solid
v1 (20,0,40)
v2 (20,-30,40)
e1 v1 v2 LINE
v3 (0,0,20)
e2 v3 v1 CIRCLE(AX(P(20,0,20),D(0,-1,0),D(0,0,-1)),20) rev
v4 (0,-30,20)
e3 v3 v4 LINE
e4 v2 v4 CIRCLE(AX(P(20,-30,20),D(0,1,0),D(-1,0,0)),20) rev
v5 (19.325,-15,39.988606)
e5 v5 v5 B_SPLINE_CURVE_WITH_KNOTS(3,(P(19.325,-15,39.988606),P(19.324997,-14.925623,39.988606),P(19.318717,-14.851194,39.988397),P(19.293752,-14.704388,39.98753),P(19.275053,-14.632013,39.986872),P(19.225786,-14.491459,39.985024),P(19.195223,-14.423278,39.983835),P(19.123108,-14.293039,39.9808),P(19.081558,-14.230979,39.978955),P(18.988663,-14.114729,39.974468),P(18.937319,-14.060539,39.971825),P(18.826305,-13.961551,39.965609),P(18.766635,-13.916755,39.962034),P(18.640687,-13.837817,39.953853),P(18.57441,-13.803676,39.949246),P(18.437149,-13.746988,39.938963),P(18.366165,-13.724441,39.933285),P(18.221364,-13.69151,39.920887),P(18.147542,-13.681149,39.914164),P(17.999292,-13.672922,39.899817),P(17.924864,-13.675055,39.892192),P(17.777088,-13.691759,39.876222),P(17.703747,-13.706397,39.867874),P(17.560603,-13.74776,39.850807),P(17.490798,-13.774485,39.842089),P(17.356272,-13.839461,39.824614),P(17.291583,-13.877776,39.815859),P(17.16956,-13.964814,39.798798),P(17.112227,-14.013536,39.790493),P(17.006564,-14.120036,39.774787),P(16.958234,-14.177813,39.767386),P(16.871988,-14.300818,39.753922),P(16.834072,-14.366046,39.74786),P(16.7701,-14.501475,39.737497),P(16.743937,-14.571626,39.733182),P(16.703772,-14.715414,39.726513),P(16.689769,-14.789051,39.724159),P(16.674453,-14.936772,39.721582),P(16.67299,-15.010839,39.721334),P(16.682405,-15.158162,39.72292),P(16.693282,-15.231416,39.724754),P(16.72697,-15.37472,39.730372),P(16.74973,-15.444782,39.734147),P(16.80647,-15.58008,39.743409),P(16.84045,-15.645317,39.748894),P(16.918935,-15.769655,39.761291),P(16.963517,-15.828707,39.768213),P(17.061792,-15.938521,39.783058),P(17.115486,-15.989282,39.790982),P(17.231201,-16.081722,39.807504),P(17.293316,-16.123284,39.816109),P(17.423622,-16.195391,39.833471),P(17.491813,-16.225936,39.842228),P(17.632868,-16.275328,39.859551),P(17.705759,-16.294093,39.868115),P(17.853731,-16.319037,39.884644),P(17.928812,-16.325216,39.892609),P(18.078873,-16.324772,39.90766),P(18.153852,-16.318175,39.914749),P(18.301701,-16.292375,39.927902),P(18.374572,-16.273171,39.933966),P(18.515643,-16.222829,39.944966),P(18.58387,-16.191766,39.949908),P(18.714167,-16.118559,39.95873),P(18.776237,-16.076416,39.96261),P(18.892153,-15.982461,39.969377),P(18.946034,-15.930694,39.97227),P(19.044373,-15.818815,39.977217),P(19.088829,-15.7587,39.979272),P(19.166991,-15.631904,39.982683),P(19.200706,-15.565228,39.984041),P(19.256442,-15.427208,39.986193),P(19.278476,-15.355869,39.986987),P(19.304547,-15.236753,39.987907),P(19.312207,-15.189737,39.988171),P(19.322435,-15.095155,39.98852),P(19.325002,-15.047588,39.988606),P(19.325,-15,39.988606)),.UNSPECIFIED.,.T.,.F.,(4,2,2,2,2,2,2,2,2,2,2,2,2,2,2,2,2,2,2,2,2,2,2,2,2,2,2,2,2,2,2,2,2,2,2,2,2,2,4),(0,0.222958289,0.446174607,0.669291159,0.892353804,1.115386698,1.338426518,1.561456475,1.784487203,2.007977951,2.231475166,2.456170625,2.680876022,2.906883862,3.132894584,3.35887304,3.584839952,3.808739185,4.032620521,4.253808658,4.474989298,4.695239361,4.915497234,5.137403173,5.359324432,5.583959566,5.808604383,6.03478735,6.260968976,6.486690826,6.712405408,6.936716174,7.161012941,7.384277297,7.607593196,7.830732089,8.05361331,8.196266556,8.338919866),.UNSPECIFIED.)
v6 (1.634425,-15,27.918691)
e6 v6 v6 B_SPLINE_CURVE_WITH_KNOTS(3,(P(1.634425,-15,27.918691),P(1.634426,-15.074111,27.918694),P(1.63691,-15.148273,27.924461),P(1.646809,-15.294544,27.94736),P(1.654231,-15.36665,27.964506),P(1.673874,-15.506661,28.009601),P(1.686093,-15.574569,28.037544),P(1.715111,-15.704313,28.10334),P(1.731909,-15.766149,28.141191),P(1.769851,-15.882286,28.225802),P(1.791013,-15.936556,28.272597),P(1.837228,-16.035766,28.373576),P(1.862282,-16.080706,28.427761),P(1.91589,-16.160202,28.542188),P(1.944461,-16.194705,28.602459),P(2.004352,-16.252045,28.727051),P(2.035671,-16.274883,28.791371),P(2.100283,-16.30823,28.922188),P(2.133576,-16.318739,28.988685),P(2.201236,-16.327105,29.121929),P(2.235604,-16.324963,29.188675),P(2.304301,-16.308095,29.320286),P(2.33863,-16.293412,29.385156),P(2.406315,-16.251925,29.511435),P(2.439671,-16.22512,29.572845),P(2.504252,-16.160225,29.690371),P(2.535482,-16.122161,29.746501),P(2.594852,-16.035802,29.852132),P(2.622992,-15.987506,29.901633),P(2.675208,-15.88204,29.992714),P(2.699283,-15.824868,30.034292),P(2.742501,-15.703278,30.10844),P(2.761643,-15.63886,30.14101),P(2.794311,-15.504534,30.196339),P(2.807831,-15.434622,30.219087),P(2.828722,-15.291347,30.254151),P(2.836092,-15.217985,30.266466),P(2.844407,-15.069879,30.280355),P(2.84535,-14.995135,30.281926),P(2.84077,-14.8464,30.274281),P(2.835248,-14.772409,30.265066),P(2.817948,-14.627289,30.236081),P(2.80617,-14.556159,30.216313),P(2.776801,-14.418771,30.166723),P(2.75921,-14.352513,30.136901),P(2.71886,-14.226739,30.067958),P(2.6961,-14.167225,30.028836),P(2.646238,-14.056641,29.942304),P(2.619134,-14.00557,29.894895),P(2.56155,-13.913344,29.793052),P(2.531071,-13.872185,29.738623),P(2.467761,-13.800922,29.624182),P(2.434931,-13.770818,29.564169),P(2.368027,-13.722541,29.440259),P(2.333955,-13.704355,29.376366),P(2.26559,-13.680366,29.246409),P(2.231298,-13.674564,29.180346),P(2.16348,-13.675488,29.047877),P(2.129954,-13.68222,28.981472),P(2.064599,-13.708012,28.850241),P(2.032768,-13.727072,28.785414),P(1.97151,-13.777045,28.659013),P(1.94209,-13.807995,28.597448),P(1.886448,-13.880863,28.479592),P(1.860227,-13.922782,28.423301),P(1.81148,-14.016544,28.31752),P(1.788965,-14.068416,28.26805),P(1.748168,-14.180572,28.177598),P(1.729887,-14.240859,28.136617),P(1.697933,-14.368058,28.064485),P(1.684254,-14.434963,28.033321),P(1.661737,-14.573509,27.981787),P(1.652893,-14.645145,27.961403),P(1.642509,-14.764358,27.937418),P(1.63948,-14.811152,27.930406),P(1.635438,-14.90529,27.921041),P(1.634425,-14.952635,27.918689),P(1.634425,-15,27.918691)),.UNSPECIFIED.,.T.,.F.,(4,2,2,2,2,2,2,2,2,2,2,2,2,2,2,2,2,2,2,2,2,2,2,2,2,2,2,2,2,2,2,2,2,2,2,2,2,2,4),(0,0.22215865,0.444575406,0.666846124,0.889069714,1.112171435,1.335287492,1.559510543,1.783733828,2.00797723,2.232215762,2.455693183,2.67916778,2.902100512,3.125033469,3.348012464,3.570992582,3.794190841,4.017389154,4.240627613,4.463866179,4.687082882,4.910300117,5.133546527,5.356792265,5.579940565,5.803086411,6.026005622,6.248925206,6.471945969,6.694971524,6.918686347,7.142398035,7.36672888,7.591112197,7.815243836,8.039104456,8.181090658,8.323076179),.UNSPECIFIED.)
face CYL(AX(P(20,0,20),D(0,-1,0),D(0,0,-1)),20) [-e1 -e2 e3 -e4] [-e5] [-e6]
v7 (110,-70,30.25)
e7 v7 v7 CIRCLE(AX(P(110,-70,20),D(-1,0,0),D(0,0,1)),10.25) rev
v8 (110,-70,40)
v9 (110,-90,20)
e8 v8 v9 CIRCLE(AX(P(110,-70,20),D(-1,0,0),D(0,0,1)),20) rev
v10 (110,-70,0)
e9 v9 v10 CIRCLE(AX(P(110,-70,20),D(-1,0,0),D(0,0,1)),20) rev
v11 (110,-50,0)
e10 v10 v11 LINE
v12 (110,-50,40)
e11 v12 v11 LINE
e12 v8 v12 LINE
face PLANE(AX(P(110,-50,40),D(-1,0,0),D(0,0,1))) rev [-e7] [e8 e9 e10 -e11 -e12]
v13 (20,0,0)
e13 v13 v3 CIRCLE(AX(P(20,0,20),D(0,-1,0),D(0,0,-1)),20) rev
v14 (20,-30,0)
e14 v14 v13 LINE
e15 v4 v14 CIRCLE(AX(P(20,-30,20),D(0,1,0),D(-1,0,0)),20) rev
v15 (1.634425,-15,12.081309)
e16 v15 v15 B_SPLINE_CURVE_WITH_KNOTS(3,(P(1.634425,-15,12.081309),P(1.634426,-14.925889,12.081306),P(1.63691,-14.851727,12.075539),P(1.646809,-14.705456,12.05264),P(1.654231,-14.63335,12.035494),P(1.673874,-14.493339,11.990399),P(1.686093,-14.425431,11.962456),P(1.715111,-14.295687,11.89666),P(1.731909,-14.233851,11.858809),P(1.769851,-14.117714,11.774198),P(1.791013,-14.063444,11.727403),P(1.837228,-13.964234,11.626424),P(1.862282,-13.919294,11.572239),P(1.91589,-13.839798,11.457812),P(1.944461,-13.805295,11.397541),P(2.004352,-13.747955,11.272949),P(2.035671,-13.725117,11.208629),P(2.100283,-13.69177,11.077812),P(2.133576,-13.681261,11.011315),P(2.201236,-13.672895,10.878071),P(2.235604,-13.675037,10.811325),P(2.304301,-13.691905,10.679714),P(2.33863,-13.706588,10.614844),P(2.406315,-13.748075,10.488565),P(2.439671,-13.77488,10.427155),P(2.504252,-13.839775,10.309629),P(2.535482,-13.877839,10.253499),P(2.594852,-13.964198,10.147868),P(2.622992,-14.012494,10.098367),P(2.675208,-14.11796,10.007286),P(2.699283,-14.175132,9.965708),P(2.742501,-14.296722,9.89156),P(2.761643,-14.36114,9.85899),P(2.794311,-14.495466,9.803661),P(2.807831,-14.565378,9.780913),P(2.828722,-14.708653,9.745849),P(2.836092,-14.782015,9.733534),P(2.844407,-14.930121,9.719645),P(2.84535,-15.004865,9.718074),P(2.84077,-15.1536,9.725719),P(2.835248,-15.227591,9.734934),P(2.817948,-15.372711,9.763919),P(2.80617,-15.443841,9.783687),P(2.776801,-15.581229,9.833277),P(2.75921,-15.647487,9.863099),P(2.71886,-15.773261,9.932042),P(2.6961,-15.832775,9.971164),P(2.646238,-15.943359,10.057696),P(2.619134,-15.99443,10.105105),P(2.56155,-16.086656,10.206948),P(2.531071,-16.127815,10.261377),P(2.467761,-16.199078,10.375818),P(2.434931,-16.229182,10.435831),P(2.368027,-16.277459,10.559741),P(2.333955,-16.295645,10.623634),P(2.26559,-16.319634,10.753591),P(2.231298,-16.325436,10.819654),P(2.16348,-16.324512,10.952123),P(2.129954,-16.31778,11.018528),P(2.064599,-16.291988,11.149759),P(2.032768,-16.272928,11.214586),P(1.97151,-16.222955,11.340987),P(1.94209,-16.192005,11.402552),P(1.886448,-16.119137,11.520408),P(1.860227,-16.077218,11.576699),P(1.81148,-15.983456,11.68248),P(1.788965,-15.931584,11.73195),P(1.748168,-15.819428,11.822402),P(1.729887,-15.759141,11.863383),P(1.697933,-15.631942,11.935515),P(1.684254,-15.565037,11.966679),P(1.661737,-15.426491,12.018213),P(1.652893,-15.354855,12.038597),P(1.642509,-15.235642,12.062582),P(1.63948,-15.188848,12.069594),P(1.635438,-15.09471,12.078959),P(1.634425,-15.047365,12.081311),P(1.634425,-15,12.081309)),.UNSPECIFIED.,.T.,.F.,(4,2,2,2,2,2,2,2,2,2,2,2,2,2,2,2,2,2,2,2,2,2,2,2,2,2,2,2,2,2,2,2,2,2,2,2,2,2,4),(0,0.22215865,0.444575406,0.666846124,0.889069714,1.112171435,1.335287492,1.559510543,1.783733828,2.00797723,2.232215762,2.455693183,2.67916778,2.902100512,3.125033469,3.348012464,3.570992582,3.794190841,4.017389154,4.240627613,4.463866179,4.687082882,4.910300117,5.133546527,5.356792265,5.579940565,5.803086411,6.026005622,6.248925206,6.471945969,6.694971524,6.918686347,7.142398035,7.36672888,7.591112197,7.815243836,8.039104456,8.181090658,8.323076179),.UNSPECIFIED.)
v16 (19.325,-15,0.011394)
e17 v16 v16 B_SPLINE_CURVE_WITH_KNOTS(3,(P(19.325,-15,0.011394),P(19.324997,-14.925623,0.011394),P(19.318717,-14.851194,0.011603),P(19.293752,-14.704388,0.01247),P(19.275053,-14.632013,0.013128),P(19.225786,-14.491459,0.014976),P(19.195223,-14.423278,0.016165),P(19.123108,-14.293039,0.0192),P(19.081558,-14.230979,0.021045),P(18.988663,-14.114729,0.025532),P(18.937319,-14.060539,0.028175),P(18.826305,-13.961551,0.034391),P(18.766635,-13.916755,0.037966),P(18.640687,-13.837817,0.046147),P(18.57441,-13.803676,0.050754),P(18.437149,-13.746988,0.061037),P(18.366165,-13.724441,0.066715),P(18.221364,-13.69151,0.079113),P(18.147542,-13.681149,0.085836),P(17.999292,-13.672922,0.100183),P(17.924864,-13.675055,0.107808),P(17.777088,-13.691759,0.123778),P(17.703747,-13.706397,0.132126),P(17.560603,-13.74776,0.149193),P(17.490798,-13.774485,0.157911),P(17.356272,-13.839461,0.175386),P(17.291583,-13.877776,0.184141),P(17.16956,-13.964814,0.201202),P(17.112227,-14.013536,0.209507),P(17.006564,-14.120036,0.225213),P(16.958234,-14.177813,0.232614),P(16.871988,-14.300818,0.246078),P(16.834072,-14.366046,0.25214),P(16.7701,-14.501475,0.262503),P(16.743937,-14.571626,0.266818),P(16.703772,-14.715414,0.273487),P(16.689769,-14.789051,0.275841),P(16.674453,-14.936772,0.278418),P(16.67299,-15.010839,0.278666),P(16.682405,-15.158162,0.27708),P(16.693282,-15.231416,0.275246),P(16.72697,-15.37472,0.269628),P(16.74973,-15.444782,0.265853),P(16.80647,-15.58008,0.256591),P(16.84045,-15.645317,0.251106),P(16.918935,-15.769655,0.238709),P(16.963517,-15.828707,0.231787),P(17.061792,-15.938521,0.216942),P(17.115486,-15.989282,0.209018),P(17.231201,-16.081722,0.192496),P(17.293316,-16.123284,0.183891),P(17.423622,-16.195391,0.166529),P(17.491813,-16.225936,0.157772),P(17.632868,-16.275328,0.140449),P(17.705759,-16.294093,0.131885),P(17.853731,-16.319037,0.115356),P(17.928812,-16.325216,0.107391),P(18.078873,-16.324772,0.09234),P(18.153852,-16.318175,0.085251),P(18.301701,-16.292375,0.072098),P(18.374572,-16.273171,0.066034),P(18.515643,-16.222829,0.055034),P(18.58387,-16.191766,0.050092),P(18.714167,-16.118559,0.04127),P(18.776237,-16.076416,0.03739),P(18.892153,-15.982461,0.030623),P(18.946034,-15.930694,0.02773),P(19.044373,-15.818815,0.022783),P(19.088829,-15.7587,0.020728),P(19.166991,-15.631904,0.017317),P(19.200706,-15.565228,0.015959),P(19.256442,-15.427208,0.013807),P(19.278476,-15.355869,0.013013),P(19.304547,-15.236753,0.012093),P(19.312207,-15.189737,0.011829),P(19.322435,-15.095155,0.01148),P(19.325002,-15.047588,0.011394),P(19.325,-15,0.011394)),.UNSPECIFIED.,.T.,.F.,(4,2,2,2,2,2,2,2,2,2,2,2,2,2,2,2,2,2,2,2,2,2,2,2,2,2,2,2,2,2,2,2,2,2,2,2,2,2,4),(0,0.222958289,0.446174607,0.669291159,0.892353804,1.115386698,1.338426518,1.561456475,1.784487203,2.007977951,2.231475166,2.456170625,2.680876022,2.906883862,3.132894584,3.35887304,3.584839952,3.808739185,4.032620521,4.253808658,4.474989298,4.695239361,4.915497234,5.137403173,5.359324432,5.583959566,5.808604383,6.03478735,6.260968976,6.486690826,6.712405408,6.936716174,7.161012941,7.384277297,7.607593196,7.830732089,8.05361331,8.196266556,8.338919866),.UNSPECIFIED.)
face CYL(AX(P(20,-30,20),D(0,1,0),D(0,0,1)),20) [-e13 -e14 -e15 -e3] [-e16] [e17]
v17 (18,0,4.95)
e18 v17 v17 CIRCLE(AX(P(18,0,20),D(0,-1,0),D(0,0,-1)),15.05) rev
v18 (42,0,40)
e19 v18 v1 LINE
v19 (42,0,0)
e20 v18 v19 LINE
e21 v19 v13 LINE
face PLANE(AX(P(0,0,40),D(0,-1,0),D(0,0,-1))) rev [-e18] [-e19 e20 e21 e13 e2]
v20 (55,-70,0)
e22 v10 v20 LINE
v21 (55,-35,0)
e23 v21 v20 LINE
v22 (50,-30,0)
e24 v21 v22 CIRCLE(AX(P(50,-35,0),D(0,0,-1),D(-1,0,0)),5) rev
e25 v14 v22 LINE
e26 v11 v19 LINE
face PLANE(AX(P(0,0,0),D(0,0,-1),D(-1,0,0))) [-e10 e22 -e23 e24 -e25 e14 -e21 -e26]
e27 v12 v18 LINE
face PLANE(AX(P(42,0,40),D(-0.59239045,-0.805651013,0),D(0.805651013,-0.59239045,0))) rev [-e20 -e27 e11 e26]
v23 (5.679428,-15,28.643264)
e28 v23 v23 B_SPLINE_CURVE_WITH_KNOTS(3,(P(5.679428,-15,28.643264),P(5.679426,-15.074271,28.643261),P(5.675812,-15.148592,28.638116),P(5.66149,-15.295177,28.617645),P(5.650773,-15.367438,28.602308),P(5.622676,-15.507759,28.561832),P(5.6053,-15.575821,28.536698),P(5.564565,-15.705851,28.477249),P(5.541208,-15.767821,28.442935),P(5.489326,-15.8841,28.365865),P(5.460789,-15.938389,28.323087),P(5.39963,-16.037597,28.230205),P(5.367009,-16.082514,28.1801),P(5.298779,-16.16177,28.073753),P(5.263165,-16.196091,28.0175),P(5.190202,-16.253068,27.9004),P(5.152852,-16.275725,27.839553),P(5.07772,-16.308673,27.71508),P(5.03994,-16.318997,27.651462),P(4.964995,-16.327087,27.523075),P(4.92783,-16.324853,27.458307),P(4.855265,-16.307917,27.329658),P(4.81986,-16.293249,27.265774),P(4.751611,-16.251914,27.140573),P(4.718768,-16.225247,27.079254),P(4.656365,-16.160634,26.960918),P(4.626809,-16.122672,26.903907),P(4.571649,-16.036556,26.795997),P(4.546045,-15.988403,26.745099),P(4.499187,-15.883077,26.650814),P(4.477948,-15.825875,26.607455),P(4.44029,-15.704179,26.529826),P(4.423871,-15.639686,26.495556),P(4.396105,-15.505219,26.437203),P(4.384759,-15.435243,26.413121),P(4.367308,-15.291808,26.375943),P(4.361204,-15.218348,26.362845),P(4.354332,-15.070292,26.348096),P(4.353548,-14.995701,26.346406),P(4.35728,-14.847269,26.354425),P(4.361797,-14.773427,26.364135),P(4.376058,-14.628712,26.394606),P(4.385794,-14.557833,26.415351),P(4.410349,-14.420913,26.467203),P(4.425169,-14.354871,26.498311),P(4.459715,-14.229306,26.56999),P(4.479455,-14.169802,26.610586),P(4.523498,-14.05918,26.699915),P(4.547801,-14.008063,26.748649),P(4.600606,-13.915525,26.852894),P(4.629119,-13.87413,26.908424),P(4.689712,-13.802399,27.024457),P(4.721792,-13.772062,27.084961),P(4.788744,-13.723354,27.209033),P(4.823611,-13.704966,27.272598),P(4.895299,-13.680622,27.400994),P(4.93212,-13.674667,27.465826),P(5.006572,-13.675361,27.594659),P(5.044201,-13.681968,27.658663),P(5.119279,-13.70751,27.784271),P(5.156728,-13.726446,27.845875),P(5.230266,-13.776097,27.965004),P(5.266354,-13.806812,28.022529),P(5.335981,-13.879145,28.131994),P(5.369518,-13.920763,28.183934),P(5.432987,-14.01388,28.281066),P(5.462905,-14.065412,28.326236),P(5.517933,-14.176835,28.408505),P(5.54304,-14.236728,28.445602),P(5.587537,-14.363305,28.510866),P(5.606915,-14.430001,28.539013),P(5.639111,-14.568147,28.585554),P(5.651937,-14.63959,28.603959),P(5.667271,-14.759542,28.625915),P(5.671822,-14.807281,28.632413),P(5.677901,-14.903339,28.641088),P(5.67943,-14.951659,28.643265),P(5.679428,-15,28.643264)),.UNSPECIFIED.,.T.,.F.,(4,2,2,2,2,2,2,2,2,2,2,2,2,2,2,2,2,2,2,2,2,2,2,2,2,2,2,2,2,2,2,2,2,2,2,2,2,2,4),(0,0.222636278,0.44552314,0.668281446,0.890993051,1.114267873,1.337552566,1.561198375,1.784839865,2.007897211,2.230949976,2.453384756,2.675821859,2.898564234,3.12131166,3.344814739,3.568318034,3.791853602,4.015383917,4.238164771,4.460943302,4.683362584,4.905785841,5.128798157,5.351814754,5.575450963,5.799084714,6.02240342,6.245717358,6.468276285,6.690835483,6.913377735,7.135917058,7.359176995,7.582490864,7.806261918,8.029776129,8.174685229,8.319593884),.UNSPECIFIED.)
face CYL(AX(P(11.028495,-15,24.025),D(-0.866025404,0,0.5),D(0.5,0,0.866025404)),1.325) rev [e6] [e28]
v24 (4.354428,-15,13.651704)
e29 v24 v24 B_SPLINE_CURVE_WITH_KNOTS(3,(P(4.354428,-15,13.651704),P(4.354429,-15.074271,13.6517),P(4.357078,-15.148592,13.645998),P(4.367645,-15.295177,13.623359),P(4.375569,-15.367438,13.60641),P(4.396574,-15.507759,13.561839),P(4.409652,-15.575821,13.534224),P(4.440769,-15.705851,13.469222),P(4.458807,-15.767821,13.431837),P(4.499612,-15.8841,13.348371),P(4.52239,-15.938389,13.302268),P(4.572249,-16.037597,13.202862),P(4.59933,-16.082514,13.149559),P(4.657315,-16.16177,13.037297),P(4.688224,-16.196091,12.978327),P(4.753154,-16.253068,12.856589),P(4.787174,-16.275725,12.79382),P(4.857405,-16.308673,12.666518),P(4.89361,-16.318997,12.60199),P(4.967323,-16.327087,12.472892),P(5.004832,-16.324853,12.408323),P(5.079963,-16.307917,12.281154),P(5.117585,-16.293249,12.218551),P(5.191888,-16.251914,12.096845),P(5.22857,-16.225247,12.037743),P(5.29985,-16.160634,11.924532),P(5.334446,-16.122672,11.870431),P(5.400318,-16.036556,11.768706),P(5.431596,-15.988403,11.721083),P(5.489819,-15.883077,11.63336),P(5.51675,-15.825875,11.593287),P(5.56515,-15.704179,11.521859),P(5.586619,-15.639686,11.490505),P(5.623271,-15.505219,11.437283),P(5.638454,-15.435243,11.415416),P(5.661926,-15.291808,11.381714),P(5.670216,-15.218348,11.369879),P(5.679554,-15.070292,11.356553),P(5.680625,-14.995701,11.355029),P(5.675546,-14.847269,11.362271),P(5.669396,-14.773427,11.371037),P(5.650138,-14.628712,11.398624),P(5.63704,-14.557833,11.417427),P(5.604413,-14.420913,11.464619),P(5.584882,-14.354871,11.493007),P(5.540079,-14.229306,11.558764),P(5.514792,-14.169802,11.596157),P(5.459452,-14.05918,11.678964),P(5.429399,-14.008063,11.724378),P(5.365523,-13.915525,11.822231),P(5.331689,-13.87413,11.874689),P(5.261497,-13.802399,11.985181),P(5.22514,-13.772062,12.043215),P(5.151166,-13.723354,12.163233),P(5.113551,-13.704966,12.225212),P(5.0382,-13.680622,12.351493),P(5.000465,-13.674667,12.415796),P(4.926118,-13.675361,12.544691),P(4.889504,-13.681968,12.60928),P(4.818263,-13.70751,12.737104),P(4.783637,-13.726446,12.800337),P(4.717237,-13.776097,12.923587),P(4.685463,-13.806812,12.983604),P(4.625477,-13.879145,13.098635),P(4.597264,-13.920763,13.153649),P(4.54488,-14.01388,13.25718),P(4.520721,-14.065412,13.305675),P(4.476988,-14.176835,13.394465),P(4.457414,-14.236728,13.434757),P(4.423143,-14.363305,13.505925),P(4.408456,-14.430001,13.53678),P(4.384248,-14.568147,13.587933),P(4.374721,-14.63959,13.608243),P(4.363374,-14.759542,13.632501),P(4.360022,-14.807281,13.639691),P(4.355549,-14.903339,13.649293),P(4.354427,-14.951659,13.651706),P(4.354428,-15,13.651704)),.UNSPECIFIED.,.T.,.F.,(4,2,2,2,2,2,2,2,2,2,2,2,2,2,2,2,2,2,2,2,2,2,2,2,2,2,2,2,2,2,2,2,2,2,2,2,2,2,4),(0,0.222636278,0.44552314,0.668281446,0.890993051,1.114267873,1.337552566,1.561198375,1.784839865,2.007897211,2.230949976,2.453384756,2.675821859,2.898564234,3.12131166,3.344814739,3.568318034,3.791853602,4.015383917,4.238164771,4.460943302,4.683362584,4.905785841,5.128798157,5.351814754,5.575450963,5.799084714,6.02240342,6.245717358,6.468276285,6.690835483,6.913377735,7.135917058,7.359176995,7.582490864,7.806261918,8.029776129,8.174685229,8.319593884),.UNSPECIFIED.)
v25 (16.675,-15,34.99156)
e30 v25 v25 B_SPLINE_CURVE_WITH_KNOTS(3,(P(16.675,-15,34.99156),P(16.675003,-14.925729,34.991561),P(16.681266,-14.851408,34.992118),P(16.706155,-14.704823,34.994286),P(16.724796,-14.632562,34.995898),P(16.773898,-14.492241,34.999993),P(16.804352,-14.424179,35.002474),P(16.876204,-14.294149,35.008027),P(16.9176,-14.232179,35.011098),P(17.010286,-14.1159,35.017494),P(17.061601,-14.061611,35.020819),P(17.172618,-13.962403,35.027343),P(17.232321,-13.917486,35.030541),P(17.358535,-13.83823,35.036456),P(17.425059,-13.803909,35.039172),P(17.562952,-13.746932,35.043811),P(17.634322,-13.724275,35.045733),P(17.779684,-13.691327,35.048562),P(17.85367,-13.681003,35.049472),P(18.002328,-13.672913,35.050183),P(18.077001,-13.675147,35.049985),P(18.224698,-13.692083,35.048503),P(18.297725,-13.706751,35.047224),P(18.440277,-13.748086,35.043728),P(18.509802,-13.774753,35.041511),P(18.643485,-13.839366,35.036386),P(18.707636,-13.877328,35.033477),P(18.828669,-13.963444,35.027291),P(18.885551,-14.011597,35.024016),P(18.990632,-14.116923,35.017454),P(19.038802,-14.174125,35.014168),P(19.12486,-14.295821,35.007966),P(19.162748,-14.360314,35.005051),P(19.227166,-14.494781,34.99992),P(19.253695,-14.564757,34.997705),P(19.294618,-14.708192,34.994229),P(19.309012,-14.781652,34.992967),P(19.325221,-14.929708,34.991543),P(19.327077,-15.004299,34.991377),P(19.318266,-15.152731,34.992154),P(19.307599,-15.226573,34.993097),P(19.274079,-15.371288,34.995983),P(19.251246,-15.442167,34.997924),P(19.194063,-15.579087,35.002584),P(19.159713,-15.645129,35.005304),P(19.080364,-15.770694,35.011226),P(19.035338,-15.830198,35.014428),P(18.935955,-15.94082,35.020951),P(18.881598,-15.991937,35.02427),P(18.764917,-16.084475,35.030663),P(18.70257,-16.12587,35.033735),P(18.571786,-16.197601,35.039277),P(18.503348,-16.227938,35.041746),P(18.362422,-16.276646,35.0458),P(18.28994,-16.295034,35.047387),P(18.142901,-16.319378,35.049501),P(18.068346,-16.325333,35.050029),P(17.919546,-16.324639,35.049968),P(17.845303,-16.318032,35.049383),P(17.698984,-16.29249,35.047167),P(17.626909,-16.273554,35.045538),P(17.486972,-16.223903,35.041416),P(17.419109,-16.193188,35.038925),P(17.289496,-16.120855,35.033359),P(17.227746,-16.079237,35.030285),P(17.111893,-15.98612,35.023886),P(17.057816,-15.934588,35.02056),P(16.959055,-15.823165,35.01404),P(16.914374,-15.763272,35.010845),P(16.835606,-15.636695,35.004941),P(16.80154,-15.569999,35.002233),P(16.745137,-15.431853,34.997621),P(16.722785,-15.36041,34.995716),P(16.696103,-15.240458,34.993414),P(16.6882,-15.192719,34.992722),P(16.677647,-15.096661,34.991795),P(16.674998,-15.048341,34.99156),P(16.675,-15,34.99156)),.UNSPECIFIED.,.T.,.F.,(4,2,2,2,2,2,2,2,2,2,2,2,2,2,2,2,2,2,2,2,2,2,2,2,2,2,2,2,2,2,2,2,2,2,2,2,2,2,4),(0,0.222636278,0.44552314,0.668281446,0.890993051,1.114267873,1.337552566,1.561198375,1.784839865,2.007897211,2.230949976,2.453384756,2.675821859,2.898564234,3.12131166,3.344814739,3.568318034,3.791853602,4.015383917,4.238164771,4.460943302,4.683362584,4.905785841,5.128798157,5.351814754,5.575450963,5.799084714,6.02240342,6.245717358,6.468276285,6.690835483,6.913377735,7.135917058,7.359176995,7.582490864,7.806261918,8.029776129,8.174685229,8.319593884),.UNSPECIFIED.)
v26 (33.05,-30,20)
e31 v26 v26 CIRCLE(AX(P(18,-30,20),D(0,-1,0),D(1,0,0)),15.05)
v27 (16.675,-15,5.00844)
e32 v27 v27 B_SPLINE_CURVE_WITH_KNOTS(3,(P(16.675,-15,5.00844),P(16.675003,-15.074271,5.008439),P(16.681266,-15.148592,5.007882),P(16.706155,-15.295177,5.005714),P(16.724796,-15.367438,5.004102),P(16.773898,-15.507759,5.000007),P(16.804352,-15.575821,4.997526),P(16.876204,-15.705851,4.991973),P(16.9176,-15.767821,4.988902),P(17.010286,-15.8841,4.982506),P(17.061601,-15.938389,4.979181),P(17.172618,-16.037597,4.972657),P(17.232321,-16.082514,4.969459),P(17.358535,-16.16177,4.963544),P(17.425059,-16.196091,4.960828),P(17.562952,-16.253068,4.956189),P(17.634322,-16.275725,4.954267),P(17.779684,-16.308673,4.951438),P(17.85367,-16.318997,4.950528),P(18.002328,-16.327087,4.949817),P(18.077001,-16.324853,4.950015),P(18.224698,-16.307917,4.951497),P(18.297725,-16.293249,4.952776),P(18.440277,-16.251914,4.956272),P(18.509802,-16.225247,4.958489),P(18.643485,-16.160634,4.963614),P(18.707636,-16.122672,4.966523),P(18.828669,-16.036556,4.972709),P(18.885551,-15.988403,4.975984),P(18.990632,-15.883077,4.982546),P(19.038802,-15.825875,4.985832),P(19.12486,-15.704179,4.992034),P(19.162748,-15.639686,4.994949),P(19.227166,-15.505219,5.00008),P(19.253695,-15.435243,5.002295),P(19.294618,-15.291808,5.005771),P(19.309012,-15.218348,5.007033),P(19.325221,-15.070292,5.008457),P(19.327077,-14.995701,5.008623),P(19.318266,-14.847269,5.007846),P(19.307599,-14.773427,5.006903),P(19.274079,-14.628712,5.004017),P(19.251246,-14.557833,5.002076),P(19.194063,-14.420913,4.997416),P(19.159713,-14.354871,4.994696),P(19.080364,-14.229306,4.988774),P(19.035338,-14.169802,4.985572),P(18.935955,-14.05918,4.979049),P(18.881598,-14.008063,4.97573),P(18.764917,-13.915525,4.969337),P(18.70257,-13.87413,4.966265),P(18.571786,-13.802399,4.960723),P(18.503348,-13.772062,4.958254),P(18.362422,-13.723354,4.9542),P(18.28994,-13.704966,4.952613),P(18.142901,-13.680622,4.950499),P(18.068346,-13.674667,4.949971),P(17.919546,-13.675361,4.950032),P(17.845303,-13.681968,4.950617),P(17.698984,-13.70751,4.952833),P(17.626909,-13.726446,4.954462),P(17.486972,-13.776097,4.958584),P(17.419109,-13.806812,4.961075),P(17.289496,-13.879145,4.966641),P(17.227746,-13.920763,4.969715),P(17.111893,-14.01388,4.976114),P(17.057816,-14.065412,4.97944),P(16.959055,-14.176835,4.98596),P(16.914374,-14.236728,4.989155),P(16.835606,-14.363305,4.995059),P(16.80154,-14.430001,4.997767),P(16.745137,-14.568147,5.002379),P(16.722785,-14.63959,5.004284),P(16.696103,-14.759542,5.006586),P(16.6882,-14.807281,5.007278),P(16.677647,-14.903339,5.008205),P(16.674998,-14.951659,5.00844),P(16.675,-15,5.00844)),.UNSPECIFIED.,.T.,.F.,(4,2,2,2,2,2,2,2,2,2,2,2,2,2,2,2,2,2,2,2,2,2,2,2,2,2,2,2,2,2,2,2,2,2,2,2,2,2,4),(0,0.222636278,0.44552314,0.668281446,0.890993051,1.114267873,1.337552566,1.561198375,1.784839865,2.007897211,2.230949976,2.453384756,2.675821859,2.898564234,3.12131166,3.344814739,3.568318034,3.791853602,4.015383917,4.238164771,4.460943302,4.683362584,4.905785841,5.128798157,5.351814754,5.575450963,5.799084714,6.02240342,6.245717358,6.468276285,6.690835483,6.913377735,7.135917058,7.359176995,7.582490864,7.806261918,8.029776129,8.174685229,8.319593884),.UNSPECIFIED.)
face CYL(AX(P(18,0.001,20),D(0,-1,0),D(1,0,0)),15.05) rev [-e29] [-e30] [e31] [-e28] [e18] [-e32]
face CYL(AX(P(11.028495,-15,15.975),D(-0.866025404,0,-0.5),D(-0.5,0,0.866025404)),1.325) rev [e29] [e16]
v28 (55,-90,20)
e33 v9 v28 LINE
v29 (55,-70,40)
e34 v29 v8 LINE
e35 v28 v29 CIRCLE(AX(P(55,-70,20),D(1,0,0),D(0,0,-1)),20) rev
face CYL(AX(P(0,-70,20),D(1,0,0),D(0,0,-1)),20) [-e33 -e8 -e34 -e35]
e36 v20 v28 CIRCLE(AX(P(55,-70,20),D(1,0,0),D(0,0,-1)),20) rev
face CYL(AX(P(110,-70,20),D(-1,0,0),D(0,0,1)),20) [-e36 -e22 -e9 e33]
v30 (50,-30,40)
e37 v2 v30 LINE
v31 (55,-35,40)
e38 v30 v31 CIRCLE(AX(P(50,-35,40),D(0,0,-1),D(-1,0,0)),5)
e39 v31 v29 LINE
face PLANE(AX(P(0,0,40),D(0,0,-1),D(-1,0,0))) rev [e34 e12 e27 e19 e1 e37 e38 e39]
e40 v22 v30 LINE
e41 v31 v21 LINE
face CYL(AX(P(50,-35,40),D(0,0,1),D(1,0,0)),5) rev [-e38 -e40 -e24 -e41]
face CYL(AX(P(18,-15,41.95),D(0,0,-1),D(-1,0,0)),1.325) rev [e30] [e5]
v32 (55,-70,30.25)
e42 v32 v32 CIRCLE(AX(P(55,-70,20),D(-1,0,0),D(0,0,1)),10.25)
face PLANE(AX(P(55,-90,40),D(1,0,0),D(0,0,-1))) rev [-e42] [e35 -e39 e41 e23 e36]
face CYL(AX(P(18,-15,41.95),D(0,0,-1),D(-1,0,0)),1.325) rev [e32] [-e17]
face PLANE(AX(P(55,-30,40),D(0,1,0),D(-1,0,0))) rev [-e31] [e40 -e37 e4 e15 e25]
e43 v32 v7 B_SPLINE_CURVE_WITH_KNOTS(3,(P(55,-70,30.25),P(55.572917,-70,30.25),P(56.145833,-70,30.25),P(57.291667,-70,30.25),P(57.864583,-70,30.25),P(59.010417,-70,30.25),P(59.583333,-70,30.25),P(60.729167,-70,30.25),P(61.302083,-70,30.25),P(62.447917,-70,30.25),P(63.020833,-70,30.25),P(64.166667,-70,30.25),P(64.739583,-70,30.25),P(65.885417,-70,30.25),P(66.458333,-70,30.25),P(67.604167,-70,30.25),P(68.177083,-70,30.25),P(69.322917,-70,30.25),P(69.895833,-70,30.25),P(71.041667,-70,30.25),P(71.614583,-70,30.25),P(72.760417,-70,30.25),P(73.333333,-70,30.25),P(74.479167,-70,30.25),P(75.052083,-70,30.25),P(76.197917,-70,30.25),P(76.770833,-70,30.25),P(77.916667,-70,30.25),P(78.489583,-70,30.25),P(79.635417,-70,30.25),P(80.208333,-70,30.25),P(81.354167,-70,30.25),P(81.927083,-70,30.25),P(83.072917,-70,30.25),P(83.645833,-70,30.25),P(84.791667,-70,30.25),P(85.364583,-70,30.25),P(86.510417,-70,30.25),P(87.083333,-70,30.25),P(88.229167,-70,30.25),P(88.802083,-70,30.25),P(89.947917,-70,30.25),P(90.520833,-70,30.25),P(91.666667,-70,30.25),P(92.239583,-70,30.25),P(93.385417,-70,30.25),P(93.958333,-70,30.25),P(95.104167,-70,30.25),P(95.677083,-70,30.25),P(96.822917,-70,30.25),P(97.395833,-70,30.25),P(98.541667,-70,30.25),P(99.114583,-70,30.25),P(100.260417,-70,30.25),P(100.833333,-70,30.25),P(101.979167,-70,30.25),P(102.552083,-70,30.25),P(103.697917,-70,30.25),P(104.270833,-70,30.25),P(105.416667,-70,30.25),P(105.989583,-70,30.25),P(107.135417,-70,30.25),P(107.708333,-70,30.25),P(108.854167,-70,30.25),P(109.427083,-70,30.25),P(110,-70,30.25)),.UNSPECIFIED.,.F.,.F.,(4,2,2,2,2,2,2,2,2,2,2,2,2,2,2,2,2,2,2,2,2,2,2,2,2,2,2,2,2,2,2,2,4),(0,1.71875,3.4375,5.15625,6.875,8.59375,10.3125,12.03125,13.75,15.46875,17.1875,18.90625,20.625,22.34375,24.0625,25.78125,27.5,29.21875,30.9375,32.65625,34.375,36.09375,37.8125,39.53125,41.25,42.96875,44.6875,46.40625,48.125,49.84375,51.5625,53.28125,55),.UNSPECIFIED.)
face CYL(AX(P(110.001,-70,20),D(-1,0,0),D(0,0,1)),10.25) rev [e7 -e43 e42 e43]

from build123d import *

# Parameters (mm, degrees)
BOSS_EXTRUDE1_DEPTH     = 40
FILLET1_R               = 5
CUT_EXTRUDE1_REACH      = 114.805
SKETCH2_R               = 10.25
CUT_EXTRUDE2_REACH      = 133.529
SKETCH3_R               = 15.05
FILLET3_R               = 20
CUT_EXTRUDE5_DEPTH      = 37
CUT_EXTRUDE5_DEPTH_BACK = 7
SKETCH7_R               = 1.325
CUT_EXTRUDE7_DEPTH      = 7
CUT_EXTRUDE7_DEPTH_BACK = 7
SKETCH8_R               = 1.325
CUT_EXTRUDE8_DEPTH      = 7
CUT_EXTRUDE8_DEPTH_BACK = 7
SKETCH9_R               = 1.325
FILLET4_START           = -30
FILLET4_DEPTH           = 30


with BuildPart() as part:
    # Sketch1 → Boss-Extrude1 (new body)
    with BuildSketch(Plane.XY):
        Polygon((0, 0), (42, 0), (110, -50), (110, -90), (55, -90), (55, -30), (0, -30), align=None)
    extrude(amount=BOSS_EXTRUDE1_DEPTH)

    # Fillet1
    fillet1_edges = [part.edges().sort_by_distance(p)[0] for p in [
        (55, -30, 20),
    ]]
    fillet(fillet1_edges, radius=FILLET1_R)

    # Sketch2 → Cut-Extrude1 (cut, up to next)
    with BuildSketch(Plane.ZY.offset(-55), mode=Mode.PRIVATE) as cut_extrude1_sk1:
        with Locations((20, -70)):
            Circle(SKETCH2_R)
    cut_extrude1_tool1 = extrude(cut_extrude1_sk1.sketch, amount=-CUT_EXTRUDE1_REACH, mode=Mode.PRIVATE) & part.part
    add(cut_extrude1_tool1.solids().sort_by_distance((55, -70, 20))[0], mode=Mode.SUBTRACT)

    # Sketch3 → Cut-Extrude2 (cut, up to next)
    with BuildSketch(Plane.XZ.offset(30), mode=Mode.PRIVATE) as cut_extrude2_sk1:
        with Locations((18, 20)):
            Circle(SKETCH3_R)
    cut_extrude2_tool1 = extrude(cut_extrude2_sk1.sketch, amount=-CUT_EXTRUDE2_REACH, mode=Mode.PRIVATE) & part.part
    add(cut_extrude2_tool1.solids().sort_by_distance((18, -30, 20))[0], mode=Mode.SUBTRACT)

    # Fillet3
    fillet3_edges = [part.edges().sort_by_distance(p)[0] for p in [
        (82.5, -90, 0),
        (82.5, -90, 40),
    ]]
    fillet(fillet3_edges, radius=FILLET3_R - 0.0001)  # a hair under: the kernel refuses the full size

    # Sketch7 → Cut-Extrude5 (cut, two sides: drawn at the far end of the back side and taken through both)
    with BuildSketch(Plane.XY.offset(4.95).offset(-CUT_EXTRUDE5_DEPTH_BACK)):
        with Locations(Location((18, -15, 0), (0, 0, 180))):
            Circle(SKETCH7_R)
    extrude(amount=CUT_EXTRUDE5_DEPTH + CUT_EXTRUDE5_DEPTH_BACK, mode=Mode.SUBTRACT)

    # Sketch8 → Cut-Extrude7 (cut, two sides: drawn at the far end of the back side and taken through both)
    with BuildSketch(Plane(origin=(9.126571711, 0, 5.269228634), x_dir=(0.4999999999999973, 0, -0.8660254037844402), z_dir=(0.8660254037844403, 0, 0.4999999999999973)).offset(-CUT_EXTRUDE7_DEPTH_BACK)):
        with Locations(Location((-8.320508076, -15, 0), (0, 0, 180))):
            Circle(SKETCH8_R)
    extrude(amount=CUT_EXTRUDE7_DEPTH + CUT_EXTRUDE7_DEPTH_BACK, mode=Mode.SUBTRACT)

    # Sketch9 → Cut-Extrude8 (cut, two sides: drawn at the far end of the back side and taken through both)
    with BuildSketch(Plane(origin=(4.966317673, 0, 27.525), x_dir=(-0.49999999999999806, 0, -0.8660254037844399), z_dir=(0.8660254037844399, 0, -0.49999999999999806)).offset(-CUT_EXTRUDE8_DEPTH_BACK)):
        with Locations(Location((0, -15, 0), (0, 0, 180))):
            Circle(SKETCH9_R)
    extrude(amount=CUT_EXTRUDE8_DEPTH + CUT_EXTRUDE8_DEPTH_BACK, mode=Mode.SUBTRACT)

    # Fillet4: read off the stored shape, not the designer's step
    # Fillet4 outline → Fillet4 (cut)
    with BuildSketch(Plane(origin=(0, 0, 0), x_dir=(1, 0, 0), z_dir=(0, 1, 0)).offset(FILLET4_START)):
        with BuildLine():
            ThreePointArc((20, -40), (5.857864376, -34.142135624), (0, -20))
            Line((0, -20), (0, -40))
            Line((0, -40), (20, -40))
        make_face()
        with BuildLine():
            ThreePointArc((0, -20), (5.857864376, -5.857864376), (20, 0))
            Line((20, 0), (0, 0))
            Line((0, 0), (0, -20))
        make_face()
    extrude(amount=FILLET4_DEPTH, mode=Mode.SUBTRACT)


solid = part.part
